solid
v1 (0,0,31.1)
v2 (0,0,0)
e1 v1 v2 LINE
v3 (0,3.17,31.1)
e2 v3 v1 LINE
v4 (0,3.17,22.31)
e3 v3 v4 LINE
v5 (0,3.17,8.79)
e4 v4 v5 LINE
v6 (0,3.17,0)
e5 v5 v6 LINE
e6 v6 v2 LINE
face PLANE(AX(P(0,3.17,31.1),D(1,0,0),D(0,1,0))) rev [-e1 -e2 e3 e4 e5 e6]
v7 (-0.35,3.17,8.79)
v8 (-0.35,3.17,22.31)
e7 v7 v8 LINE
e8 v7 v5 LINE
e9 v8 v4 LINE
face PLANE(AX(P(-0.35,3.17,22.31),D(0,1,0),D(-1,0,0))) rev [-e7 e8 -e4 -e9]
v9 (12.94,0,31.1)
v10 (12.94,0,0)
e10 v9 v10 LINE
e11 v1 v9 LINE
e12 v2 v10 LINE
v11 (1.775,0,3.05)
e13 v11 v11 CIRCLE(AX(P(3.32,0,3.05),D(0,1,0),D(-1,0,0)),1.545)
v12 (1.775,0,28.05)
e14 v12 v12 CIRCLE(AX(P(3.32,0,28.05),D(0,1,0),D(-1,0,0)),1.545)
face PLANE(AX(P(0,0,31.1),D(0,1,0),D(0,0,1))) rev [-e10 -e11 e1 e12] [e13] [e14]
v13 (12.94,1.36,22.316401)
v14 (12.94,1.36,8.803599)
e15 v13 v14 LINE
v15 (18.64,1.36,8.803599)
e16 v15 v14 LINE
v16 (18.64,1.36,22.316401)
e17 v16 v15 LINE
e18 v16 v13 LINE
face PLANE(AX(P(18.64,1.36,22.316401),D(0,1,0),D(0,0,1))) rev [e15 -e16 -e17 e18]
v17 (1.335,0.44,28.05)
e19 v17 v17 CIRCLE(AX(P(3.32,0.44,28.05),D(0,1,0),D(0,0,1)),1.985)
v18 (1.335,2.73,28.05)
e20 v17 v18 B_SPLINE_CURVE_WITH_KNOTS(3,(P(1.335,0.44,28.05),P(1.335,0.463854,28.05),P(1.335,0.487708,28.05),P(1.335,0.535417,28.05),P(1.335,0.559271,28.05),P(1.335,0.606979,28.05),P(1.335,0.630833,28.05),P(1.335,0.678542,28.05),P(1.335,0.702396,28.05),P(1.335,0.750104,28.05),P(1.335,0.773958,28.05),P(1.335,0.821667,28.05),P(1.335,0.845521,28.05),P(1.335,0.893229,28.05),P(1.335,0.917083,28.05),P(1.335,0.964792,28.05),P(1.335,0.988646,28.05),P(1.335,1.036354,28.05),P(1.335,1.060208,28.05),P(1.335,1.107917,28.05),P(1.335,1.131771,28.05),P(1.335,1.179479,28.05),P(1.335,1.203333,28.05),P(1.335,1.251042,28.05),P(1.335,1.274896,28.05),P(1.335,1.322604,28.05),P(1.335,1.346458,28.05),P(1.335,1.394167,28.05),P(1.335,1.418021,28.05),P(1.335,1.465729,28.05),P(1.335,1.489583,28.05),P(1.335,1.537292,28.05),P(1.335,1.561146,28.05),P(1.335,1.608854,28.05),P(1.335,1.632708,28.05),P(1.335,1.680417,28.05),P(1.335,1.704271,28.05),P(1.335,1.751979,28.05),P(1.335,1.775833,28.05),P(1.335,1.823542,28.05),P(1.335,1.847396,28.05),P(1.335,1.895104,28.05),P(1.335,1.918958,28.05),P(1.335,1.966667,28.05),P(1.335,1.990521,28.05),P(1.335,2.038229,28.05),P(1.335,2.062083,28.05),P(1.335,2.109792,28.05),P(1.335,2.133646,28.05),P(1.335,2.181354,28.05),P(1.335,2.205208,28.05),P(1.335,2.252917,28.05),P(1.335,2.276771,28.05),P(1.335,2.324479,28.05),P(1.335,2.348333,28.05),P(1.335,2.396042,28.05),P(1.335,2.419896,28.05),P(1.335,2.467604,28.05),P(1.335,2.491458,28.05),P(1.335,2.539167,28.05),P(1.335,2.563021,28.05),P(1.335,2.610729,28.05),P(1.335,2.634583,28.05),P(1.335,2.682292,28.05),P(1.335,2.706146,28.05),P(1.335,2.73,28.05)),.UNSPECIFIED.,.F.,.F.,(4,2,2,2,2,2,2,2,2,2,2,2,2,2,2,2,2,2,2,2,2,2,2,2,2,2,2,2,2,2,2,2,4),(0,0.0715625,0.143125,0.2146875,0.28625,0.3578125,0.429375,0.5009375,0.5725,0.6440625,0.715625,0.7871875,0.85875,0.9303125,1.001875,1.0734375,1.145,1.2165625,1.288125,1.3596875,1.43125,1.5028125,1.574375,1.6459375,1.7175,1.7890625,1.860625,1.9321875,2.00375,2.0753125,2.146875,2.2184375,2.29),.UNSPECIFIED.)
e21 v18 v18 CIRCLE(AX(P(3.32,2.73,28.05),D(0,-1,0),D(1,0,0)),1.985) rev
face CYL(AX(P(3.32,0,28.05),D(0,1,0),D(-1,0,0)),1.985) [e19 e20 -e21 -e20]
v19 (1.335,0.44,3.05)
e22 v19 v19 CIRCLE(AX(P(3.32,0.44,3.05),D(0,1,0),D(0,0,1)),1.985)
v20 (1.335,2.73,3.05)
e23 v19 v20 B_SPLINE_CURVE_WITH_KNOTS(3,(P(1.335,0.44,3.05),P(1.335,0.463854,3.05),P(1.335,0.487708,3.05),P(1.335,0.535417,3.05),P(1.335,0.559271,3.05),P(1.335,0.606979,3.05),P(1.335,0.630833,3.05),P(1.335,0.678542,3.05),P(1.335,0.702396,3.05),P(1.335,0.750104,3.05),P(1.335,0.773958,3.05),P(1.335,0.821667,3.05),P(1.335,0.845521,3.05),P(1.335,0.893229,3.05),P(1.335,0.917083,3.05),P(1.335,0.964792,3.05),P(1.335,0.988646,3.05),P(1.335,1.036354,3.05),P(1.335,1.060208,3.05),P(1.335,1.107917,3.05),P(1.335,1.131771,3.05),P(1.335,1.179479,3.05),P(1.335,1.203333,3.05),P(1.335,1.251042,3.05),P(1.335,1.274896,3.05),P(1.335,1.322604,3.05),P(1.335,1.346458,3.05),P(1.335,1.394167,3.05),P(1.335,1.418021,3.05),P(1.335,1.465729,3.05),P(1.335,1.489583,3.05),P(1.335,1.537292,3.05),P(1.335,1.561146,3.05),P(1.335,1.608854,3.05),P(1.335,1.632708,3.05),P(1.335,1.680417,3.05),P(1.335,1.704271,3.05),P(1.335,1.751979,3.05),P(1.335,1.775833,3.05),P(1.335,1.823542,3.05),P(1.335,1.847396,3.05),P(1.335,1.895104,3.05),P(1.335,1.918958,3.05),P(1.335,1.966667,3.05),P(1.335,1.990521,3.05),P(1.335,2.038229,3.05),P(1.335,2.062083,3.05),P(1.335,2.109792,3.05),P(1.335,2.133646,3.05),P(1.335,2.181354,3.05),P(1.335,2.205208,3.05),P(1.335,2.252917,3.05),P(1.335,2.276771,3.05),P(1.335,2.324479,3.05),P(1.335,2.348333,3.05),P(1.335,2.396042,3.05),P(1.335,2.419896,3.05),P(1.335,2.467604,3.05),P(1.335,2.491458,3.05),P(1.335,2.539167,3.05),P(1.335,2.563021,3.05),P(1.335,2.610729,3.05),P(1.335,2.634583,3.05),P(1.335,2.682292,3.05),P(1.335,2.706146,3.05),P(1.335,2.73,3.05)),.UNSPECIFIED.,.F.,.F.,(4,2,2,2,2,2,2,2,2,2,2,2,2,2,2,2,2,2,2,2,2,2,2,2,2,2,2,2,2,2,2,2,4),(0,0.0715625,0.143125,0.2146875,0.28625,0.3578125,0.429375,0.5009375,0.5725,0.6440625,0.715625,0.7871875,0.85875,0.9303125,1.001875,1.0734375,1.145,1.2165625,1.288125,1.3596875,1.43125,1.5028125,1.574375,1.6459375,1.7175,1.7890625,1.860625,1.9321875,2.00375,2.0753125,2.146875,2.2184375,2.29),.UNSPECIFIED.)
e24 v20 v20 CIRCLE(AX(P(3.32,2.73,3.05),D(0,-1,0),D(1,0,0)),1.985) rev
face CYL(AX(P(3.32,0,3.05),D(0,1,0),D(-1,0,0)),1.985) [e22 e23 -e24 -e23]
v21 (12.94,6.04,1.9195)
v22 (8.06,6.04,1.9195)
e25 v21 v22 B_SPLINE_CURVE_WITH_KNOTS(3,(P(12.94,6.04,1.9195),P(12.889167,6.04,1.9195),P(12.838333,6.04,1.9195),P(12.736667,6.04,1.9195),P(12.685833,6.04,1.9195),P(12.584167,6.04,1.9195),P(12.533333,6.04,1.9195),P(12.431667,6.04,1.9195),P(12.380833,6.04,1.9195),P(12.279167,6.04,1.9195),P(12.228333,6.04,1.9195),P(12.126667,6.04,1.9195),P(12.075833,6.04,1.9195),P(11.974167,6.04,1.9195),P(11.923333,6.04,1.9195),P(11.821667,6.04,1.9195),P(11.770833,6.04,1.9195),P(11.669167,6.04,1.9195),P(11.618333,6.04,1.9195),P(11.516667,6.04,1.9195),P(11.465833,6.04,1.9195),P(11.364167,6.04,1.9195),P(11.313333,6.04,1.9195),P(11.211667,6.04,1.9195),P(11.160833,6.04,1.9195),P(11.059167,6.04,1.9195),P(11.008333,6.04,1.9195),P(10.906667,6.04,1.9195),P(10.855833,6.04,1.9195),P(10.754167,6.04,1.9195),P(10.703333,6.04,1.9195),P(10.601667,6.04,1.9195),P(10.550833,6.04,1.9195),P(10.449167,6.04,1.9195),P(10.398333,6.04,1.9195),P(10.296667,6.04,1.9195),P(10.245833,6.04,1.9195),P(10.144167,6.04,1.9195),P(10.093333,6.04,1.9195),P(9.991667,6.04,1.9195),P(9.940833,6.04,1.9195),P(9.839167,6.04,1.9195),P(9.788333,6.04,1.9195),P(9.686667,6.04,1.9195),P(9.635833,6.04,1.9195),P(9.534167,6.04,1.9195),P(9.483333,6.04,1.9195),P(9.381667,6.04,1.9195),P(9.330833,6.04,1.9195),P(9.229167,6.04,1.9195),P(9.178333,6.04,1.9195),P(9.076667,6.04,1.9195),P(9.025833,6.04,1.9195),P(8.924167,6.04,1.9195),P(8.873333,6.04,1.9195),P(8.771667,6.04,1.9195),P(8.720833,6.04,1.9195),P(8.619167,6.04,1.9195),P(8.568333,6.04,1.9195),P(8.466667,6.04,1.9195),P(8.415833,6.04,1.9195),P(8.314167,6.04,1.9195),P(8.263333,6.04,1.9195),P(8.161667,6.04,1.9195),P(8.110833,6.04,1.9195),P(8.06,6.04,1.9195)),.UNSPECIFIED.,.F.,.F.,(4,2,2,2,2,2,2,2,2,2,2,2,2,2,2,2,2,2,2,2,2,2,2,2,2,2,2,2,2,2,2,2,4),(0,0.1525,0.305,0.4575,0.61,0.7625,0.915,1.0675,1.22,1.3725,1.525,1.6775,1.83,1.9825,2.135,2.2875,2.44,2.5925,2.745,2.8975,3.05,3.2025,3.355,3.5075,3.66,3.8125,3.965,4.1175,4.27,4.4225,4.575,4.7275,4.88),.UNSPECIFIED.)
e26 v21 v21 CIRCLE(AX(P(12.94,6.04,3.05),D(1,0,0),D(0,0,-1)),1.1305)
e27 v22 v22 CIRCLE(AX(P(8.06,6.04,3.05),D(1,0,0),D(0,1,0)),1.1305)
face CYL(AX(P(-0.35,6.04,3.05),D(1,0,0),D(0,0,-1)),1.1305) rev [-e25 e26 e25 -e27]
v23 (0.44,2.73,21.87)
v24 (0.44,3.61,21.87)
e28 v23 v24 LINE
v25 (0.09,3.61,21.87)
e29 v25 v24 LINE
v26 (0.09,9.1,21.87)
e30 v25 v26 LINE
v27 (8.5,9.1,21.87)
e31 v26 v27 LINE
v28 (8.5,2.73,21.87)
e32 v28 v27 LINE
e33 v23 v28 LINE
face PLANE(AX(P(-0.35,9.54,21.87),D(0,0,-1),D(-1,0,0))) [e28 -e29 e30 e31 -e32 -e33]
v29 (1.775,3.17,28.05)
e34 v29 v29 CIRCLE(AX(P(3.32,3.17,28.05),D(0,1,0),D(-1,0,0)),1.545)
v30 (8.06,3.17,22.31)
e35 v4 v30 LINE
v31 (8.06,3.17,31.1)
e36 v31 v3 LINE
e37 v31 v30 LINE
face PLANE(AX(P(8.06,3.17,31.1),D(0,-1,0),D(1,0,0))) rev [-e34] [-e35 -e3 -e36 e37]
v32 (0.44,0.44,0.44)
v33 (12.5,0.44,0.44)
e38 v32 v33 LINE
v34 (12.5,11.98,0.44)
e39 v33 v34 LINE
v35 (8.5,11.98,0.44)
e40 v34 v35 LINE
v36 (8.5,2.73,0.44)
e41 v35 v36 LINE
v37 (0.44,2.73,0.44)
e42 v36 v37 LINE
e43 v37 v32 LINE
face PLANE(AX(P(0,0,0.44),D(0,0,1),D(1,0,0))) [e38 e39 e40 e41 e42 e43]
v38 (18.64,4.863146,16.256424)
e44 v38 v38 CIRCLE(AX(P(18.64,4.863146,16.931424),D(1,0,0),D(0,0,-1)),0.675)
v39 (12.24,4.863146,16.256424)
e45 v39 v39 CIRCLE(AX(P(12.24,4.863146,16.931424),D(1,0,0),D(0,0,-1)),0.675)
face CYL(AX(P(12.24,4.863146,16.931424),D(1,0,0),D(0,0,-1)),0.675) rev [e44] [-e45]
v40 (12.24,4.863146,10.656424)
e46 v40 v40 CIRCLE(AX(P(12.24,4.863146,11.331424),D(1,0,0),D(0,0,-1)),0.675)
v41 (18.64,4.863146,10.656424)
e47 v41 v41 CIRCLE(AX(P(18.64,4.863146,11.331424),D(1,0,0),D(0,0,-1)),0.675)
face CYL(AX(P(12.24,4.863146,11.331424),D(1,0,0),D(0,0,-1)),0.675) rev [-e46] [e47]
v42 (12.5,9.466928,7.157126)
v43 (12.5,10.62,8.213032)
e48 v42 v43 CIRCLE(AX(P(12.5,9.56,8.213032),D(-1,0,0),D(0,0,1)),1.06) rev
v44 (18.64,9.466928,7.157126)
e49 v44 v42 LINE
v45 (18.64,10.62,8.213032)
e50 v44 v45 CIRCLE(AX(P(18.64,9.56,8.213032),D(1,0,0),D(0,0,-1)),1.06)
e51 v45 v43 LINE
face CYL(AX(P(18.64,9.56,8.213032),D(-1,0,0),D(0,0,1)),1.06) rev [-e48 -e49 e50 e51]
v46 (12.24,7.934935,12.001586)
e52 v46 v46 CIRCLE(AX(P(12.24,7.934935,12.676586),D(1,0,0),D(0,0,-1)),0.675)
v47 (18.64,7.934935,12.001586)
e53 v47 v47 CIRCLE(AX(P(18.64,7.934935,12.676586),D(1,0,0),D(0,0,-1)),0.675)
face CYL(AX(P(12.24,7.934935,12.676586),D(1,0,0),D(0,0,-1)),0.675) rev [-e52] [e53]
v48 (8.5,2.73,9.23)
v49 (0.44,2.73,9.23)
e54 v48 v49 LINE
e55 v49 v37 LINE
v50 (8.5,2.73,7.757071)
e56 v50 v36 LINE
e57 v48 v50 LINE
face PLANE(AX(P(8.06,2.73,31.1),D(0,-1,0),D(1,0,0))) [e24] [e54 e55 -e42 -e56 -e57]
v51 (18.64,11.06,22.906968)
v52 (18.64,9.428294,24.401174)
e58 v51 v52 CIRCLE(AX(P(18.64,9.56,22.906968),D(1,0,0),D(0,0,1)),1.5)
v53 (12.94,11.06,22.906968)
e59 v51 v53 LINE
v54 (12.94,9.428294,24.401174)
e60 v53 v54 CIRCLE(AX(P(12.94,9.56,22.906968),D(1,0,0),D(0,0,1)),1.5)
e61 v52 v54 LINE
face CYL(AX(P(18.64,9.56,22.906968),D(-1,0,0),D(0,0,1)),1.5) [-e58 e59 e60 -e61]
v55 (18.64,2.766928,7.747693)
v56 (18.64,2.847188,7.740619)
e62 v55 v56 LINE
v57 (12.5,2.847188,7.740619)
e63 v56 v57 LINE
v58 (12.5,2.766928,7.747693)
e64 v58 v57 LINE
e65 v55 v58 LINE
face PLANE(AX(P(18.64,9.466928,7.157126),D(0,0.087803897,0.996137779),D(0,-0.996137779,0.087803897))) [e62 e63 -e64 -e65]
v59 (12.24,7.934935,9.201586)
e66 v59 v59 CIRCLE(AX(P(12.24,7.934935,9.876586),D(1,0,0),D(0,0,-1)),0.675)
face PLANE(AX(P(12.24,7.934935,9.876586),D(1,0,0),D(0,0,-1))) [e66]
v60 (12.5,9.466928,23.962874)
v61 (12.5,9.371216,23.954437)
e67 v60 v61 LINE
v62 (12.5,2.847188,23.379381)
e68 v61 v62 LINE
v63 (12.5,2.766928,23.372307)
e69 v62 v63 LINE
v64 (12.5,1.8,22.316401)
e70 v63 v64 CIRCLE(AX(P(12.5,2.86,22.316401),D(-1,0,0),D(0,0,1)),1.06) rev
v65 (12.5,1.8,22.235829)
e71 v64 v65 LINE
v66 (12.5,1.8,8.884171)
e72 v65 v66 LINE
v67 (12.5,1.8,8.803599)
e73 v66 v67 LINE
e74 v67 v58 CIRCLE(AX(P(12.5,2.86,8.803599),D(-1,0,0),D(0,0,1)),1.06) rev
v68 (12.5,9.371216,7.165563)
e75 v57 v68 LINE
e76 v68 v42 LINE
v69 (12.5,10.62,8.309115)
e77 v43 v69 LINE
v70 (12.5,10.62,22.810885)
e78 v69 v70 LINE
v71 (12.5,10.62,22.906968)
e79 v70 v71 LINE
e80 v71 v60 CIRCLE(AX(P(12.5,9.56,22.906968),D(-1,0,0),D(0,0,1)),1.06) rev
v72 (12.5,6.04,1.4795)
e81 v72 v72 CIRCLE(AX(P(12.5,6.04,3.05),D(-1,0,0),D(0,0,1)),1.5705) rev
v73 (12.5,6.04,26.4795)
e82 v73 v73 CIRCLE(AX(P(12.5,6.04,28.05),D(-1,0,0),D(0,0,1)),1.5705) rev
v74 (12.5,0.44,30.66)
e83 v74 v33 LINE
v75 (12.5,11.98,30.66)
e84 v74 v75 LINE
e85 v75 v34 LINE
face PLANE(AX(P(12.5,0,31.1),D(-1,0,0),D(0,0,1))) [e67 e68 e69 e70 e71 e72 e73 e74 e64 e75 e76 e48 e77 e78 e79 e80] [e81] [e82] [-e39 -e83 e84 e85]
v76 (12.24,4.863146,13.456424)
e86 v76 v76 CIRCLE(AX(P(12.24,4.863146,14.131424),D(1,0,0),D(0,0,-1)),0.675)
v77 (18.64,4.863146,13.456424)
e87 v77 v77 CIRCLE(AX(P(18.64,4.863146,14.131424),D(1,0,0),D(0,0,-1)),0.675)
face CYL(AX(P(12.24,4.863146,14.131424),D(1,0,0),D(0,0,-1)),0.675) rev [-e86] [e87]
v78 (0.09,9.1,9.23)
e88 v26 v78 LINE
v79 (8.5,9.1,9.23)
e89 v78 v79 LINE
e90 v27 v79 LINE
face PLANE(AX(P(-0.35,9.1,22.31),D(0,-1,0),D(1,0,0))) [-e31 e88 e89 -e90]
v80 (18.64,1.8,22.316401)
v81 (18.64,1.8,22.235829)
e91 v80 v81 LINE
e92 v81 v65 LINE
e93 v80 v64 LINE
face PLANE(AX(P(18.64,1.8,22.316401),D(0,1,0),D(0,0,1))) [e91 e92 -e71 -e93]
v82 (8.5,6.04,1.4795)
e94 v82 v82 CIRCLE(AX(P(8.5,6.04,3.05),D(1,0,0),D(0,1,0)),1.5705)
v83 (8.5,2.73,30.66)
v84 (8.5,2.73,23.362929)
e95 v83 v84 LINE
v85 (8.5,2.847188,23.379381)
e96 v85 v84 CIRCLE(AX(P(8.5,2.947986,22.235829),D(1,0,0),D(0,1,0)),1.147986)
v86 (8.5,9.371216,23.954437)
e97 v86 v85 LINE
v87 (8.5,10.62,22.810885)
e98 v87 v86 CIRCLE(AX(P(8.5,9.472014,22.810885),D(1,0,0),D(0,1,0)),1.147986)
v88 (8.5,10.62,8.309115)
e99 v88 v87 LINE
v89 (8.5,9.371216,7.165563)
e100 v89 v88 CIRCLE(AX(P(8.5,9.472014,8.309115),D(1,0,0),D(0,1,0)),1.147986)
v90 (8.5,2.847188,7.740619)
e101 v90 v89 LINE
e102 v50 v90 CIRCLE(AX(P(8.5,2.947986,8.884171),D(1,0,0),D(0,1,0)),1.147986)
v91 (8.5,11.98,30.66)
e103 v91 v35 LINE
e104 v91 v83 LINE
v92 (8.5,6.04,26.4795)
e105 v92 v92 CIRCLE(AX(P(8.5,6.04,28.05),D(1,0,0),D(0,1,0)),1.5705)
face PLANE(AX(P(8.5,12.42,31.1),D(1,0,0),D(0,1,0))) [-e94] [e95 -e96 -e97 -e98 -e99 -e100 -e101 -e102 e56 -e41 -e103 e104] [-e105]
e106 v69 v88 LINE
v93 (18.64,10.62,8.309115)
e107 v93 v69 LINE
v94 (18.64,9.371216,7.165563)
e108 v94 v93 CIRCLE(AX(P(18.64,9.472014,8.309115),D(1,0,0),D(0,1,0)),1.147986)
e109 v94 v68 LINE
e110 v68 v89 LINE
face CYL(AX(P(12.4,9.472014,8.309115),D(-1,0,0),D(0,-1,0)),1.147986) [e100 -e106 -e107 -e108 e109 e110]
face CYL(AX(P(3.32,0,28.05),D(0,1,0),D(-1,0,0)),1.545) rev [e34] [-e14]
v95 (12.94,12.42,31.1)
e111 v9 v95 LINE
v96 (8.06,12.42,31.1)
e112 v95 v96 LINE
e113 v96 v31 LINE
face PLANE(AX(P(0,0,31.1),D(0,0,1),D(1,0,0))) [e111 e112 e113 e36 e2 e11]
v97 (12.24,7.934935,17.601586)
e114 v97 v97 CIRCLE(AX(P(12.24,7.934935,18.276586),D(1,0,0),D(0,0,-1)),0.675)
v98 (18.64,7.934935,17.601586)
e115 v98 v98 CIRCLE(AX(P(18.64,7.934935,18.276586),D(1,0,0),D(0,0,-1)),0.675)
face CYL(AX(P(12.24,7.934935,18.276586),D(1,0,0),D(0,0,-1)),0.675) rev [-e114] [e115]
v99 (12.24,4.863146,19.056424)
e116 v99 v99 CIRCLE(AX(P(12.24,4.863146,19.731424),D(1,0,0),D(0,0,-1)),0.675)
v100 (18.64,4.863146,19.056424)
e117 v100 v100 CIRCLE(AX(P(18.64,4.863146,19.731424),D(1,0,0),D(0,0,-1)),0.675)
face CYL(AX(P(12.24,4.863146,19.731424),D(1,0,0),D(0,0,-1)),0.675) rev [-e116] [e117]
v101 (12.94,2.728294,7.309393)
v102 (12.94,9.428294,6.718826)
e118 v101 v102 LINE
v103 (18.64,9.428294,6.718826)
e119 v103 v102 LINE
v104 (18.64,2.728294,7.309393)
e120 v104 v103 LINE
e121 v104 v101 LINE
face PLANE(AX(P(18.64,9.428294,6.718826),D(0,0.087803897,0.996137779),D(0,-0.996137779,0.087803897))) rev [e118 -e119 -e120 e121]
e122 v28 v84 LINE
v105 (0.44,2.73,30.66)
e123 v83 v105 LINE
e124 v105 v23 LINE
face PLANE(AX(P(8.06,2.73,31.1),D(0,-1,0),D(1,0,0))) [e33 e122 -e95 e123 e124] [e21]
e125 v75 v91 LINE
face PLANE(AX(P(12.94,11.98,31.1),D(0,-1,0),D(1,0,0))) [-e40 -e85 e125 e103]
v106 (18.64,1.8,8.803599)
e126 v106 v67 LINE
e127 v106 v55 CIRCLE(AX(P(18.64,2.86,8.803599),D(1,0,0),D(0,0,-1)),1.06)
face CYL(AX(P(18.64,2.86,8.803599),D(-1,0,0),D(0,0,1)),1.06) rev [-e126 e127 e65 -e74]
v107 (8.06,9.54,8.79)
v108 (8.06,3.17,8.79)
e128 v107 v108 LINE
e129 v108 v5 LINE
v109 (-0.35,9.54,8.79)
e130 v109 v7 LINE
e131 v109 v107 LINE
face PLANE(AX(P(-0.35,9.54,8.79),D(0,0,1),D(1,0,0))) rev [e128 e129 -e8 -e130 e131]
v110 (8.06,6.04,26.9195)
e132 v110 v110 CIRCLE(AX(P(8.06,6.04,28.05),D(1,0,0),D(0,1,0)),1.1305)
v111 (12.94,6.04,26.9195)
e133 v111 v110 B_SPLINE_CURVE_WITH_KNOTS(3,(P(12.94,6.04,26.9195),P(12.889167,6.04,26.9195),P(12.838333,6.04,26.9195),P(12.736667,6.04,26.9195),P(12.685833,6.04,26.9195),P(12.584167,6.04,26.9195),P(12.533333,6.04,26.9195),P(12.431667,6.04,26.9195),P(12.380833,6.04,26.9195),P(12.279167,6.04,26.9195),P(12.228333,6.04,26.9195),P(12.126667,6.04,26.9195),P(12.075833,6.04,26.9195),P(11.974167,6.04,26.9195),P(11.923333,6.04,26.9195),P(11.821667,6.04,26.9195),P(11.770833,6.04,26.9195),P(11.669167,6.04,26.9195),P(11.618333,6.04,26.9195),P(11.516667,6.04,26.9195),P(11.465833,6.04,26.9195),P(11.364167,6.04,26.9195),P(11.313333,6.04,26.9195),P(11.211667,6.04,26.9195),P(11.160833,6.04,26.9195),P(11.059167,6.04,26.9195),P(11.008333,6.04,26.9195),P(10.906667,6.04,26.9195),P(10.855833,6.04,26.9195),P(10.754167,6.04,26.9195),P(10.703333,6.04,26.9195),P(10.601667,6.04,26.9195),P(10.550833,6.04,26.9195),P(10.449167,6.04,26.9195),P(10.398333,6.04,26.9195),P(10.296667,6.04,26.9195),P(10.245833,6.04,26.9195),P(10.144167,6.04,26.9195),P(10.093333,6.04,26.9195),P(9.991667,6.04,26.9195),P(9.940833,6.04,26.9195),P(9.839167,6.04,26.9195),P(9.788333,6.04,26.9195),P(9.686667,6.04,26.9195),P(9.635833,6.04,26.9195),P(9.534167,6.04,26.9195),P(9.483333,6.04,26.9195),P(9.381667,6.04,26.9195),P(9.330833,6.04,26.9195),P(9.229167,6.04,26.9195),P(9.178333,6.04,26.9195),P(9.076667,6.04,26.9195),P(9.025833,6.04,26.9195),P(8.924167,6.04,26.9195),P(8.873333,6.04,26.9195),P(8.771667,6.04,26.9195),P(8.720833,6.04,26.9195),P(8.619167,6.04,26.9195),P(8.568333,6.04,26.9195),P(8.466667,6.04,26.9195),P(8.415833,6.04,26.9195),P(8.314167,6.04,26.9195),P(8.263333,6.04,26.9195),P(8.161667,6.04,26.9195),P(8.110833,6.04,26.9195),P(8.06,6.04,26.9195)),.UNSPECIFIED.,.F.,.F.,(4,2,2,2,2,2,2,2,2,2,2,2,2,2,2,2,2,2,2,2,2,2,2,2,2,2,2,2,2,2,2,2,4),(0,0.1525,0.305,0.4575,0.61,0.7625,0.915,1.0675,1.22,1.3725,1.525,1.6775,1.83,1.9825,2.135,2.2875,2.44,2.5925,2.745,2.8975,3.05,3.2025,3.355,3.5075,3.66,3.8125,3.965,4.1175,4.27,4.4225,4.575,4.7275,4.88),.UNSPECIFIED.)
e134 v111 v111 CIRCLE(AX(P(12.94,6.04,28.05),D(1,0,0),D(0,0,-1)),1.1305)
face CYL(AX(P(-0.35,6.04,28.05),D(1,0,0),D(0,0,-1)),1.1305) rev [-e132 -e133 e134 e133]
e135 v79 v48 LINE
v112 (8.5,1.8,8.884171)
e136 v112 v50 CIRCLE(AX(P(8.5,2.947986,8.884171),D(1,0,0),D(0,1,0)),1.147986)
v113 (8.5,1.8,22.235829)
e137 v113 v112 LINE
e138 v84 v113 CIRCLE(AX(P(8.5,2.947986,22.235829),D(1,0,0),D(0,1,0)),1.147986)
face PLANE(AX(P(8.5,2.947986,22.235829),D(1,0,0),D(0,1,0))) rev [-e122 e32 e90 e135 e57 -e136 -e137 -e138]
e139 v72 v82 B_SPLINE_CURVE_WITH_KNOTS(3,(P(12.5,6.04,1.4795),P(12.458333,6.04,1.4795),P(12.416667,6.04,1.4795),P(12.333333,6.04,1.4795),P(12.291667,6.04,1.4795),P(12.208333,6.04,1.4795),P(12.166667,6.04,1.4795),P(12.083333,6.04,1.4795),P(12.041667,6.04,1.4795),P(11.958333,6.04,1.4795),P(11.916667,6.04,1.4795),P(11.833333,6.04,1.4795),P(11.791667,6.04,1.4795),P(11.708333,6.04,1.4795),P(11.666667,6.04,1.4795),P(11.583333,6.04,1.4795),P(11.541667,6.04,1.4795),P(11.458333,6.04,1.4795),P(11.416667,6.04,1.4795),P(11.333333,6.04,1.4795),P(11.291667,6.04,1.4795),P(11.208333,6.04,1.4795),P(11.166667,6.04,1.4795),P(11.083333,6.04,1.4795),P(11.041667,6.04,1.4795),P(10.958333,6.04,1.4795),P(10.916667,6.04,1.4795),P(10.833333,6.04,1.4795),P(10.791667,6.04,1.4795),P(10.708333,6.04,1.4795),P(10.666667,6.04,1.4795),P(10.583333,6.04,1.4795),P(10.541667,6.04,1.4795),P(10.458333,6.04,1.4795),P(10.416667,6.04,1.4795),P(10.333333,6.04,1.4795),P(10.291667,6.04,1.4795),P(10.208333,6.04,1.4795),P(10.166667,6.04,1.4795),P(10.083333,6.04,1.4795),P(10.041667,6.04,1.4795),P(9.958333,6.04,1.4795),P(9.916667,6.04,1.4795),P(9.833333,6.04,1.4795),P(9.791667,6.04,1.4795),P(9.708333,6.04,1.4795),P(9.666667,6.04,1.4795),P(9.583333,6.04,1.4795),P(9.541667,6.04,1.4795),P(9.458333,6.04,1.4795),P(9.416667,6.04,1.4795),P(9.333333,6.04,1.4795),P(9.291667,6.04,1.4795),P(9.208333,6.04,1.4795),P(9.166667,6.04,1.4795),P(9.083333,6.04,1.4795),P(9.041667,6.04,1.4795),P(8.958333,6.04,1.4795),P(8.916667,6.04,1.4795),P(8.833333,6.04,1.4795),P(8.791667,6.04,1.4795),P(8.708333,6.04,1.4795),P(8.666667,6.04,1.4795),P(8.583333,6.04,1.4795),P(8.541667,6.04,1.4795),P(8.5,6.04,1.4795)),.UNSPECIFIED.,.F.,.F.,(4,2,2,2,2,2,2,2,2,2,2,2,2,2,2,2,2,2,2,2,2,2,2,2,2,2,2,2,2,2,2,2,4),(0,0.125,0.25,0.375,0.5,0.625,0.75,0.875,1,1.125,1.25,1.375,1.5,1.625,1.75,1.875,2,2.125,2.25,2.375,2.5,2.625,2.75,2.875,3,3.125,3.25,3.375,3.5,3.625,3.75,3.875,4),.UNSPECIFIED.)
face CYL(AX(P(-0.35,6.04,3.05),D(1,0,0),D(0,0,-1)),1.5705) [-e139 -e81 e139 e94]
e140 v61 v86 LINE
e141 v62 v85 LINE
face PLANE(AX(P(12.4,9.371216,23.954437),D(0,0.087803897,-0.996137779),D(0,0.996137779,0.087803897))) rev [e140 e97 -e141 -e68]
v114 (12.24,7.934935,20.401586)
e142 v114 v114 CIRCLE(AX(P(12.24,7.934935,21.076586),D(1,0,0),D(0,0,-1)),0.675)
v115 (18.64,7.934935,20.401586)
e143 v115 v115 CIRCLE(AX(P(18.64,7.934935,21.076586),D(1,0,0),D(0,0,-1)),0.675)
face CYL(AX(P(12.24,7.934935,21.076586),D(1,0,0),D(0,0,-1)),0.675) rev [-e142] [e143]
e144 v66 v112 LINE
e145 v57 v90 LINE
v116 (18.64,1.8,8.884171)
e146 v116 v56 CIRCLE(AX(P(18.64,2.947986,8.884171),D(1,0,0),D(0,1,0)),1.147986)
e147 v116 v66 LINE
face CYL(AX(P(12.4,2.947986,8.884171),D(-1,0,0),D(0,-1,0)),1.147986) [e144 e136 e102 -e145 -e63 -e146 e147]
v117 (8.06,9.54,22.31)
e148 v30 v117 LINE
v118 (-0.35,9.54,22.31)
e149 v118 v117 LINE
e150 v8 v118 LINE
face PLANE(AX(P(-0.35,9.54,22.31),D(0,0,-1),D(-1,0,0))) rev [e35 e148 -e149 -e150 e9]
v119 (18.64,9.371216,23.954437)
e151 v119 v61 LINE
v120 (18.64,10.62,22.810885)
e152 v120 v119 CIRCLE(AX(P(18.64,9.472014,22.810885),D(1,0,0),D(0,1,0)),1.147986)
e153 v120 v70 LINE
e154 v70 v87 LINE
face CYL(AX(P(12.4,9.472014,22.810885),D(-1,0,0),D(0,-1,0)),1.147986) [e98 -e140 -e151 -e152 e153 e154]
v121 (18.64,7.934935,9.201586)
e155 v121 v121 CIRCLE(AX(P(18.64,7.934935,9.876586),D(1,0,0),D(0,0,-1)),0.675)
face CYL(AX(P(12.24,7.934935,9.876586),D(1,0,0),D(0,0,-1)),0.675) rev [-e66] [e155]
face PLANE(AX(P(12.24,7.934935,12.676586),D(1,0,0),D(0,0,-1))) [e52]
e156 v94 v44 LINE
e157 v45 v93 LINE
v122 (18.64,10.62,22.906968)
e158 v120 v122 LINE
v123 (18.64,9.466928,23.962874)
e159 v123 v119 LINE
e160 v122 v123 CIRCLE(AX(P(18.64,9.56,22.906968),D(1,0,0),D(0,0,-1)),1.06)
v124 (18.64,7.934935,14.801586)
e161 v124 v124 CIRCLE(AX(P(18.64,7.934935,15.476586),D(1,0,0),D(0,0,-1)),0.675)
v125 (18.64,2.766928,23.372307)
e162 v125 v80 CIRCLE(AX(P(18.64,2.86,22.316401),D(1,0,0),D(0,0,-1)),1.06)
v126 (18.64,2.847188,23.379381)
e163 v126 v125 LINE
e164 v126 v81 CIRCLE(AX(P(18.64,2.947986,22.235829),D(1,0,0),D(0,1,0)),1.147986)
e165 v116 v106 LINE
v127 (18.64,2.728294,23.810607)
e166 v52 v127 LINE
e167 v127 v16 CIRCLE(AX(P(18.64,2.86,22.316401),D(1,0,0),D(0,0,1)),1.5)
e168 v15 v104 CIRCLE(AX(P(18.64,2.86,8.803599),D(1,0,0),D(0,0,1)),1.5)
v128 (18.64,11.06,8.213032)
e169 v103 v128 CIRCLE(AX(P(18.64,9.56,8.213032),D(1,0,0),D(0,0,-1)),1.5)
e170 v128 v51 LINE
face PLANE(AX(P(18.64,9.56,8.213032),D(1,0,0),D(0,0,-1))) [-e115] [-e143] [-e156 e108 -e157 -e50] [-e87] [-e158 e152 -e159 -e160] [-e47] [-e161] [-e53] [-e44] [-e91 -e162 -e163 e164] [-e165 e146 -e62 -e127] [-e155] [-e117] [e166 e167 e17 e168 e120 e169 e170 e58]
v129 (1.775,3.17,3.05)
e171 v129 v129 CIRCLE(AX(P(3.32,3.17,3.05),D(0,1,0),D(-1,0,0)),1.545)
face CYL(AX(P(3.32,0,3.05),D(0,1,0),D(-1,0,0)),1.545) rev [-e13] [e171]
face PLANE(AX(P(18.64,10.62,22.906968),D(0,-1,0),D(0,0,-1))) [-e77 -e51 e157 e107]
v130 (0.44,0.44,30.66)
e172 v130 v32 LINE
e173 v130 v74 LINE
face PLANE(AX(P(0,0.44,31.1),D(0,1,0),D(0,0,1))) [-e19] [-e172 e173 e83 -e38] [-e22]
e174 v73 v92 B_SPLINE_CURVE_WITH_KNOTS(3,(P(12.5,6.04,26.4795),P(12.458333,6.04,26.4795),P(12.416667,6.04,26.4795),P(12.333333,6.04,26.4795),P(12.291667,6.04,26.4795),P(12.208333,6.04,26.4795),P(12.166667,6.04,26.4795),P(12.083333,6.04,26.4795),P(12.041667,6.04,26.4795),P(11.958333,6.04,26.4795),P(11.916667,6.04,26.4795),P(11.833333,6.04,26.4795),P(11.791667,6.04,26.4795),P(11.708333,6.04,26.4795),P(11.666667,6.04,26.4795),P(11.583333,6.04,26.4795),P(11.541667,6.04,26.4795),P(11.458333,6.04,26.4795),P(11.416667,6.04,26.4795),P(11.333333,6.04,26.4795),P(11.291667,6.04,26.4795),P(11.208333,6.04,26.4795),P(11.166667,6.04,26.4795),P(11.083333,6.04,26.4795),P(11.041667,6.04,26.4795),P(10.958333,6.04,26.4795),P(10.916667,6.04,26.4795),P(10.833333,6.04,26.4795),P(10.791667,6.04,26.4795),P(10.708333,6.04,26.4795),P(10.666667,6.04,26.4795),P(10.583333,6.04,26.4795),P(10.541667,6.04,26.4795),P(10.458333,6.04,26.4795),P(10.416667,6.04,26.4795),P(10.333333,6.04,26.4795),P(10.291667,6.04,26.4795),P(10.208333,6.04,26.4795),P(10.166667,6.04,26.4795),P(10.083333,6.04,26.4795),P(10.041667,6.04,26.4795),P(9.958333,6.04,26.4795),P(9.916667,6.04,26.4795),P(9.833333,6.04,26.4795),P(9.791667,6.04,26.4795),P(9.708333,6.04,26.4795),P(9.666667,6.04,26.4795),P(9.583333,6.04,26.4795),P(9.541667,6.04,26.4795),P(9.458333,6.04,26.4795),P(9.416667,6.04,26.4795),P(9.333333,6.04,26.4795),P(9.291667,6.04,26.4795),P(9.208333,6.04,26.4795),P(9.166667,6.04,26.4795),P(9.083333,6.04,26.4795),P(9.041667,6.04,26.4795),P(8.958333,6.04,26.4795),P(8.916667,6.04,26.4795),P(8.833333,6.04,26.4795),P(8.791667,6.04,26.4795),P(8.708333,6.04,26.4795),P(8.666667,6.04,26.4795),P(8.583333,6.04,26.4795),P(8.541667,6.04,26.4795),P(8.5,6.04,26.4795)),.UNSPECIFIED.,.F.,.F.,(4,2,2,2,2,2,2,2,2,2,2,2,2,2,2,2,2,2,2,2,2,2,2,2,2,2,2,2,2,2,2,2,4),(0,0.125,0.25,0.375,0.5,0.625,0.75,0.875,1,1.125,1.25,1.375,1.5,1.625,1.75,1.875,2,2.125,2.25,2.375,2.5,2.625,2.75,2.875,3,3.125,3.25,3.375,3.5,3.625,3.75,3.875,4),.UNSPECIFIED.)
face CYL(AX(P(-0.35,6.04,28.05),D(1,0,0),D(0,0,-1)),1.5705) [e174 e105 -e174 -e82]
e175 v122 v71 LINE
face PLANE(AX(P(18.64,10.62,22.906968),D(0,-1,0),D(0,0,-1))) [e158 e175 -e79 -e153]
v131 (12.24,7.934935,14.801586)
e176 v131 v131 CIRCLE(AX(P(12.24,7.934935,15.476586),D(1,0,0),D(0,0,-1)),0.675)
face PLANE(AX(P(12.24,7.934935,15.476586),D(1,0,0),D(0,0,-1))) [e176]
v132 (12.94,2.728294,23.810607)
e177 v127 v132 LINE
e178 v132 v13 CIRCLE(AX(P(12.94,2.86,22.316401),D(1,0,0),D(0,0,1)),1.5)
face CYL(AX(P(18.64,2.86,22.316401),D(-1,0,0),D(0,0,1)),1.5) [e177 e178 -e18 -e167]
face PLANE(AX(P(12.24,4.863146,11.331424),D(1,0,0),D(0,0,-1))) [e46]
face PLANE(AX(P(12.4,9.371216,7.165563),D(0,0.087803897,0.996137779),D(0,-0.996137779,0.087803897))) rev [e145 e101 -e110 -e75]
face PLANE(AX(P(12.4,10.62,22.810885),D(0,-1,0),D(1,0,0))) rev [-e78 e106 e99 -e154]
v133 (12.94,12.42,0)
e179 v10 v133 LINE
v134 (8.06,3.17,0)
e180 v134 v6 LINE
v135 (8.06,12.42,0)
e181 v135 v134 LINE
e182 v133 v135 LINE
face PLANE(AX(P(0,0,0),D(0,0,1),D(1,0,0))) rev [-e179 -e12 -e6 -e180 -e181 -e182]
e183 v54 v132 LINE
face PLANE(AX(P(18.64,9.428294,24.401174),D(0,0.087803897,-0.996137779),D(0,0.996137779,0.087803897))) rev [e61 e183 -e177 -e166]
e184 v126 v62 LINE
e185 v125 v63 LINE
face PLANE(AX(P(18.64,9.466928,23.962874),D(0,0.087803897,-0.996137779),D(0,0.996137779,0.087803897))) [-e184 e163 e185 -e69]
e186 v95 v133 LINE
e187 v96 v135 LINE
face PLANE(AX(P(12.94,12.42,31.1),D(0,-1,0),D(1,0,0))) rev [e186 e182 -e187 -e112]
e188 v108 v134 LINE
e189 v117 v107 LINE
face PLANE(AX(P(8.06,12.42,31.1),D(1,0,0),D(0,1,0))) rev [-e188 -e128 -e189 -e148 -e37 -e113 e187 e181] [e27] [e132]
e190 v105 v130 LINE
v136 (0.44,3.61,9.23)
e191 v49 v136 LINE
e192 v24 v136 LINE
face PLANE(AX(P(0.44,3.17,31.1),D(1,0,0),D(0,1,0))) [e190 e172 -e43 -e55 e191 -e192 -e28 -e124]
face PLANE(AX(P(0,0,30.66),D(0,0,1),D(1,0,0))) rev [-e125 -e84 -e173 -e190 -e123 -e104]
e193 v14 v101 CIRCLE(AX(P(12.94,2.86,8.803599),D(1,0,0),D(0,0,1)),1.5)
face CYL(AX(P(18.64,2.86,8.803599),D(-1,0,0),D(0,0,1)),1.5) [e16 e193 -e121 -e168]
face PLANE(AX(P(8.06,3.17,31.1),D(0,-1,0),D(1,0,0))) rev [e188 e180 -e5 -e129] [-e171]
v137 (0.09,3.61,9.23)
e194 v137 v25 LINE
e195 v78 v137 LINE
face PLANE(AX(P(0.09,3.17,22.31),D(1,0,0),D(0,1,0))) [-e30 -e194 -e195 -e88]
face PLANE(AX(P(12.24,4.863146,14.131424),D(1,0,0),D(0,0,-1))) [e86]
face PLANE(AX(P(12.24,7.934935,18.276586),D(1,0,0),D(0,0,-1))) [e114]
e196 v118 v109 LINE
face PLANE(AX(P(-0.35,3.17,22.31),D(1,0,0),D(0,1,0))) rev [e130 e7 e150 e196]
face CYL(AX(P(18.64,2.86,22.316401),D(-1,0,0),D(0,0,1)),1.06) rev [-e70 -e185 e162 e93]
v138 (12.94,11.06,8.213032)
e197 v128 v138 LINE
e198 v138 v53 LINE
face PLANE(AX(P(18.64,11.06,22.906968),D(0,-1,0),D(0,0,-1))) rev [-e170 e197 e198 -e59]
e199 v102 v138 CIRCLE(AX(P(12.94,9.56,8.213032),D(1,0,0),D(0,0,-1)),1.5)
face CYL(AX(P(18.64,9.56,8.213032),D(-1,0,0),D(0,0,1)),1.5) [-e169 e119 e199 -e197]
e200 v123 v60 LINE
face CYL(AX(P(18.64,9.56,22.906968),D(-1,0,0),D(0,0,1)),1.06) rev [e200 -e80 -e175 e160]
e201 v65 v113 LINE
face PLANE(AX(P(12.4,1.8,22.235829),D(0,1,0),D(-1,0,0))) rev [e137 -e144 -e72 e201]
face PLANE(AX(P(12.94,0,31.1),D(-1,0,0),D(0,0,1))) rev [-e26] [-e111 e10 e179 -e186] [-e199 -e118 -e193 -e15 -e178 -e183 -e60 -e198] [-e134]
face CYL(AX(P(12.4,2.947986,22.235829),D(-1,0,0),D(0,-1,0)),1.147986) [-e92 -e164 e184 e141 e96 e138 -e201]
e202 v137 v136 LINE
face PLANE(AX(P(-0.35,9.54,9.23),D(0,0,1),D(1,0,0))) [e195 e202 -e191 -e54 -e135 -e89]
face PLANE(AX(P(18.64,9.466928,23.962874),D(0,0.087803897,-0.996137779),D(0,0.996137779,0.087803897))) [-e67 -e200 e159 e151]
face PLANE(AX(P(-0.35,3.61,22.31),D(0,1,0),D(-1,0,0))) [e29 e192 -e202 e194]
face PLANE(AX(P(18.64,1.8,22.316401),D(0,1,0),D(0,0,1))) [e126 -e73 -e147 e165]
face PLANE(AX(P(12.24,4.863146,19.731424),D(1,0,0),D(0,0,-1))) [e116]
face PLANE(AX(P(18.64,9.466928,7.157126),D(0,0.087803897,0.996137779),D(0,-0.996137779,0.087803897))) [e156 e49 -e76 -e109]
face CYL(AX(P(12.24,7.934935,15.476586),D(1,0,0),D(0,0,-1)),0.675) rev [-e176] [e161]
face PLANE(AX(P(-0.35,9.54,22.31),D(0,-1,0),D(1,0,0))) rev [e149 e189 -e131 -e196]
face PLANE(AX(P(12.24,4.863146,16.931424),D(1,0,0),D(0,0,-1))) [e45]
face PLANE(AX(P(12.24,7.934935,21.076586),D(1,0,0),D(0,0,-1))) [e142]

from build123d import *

# Parameters (mm, degrees)
BASE_EXTRUDE_DEPTH         = 31.1
SKETCH2_W                  = 13.52
SKETCH2_H                  = 6.37
BOSS_EXTRUDE1_DEPTH        = 8.41
SKETCH3_R                  = 1.545
BASE_MOUNTING_HOLE_1_DEPTH = 35.931591719
SKETCH5_R                  = 1.1305
FACE_MOUNTING_HOLES_DEPTH  = 37.029023023
SHELL_AROUND_PINS_DEPTH    = 5.7
SHELL1_START               = 0.44
SHELL1_DEPTH               = 18.2
SHELL1_START_2             = 8.5
SHELL1_2_OUTLINE_W         = 11.54
SHELL1_2_OUTLINE_H         = 30.22
SHELL1_2_OUTLINE_R         = 1.5705
SHELL1_2_DEPTH             = 4
SHELL1_START_3             = 12.5
SHELL1_3_DEPTH             = 6.14
SHELL1_START_4             = 5.3050001
SHELL1_4_DEPTH             = 3.1949999
SHELL1_5_DEPTH             = 0.8949999
SHELL1_START_5             = 0.09
SHELL1_6_OUTLINE_W         = 5.49
SHELL1_6_OUTLINE_H         = 12.64
SHELL1_6_DEPTH             = 0.35
SHELL1_7_DEPTH             = 2.29
BOSS_EXTRUDE2_DEPTH        = 3.9
BOSS_EXTRUDE3_DEPTH        = 6.24
SKETCH9_R                  = 0.675
CUT_EXTRUDE1_DEPTH         = 6.4


with BuildPart() as part:
    # Sketch1 → Base-Extrude (new body)
    with BuildSketch(Plane.XY):
        Polygon((0, 0), (12.94, 0), (12.94, 12.42), (8.06, 12.42), (8.06, 3.17), (0, 3.17), align=None)
    extrude(amount=BASE_EXTRUDE_DEPTH)

    # Sketch2 → Boss-Extrude1 (add)
    with BuildSketch(Plane.ZY.offset(-8.06)):
        with Locations((15.55, 6.355)):
            Rectangle(SKETCH2_W, SKETCH2_H)
    extrude(amount=BOSS_EXTRUDE1_DEPTH)

    # Sketch3 → Base Mounting Hole 1 (cut, through all)
    with BuildSketch(Plane(origin=(0, 3.17, 0), x_dir=(-1, 0, 0), z_dir=(0, 1, 0))):
        with Locations((-3.32, 3.05)):
            Circle(SKETCH3_R)
        with Locations((-3.32, 28.05)):
            Circle(SKETCH3_R)
    extrude(amount=-BASE_MOUNTING_HOLE_1_DEPTH, mode=Mode.SUBTRACT)

    # Sketch5 → Face Mounting Holes (cut, through all)
    with BuildSketch(Plane(origin=(12.94, 0, 0), x_dir=(0, 0, -1), z_dir=(1, 0, 0))):
        with Locations((-3.05, 6.04)):
            Circle(SKETCH5_R)
        with Locations((-28.05, 6.04)):
            Circle(SKETCH5_R)
    extrude(amount=-FACE_MOUNTING_HOLES_DEPTH, mode=Mode.SUBTRACT)

    # Sketch6 → Shell around Pins (add)
    with BuildSketch(Plane(origin=(12.94, 0, 0), x_dir=(0, 0, -1), z_dir=(1, 0, 0))):
        with BuildLine():
            Line((-22.906967712, 11.06), (-8.213032288, 11.06))
            ThreePointArc((-8.213032288, 11.06), (-7.106786662, 10.573025476), (-6.718825618, 9.428294154))
            Line((-6.718825618, 9.428294154), (-7.309392629, 2.728294154))
            ThreePointArc((-7.309392629, 2.728294154), (-7.790573821, 1.753754374), (-8.803599298, 1.36))
            Line((-8.803599298, 1.36), (-22.316400702, 1.36))
            ThreePointArc((-22.316400702, 1.36), (-23.329426179, 1.753754374), (-23.810607371, 2.728294154))
            Line((-23.810607371, 2.728294154), (-24.401174382, 9.428294154))
            ThreePointArc((-24.401174382, 9.428294154), (-24.013213338, 10.573025476), (-22.906967712, 11.06))
        make_face()
    extrude(amount=SHELL_AROUND_PINS_DEPTH)

    # Shell1: read off the stored shape, not the designer's step
    # Shell1 outline → Shell1 (cut)
    with BuildSketch(Plane.YZ.offset(SHELL1_START)):
        with BuildLine():
            Line((2.73, 21.87), (2.73, 23.368398801))
            ThreePointArc((2.73, 23.368398801), (2.06583377, 23.018469075), (1.8, 22.316400702))
            Line((1.8, 22.316400702), (1.8, 8.803599298))
            ThreePointArc((1.8, 8.803599298), (2.06583377, 8.101530925), (2.73, 7.751601199))
            Line((2.73, 7.751601199), (2.73, 9.23))
            Line((2.73, 9.23), (9.1, 9.23))
            Line((9.1, 9.23), (9.1, 21.87))
            Line((9.1, 21.87), (2.73, 21.87))
        make_face()
    extrude(amount=SHELL1_DEPTH, mode=Mode.SUBTRACT)

    # Shell1 2 outline → Shell1 2 (cut)
    with BuildSketch(Plane.YZ.offset(SHELL1_START_2)):
        with Locations((6.21, 15.55)):
            Rectangle(SHELL1_2_OUTLINE_W, SHELL1_2_OUTLINE_H)
        with Locations((6.04, 3.05)):
            Circle(SHELL1_2_OUTLINE_R, mode=Mode.SUBTRACT)
        with Locations((6.04, 28.05)):
            Circle(SHELL1_2_OUTLINE_R, mode=Mode.SUBTRACT)
        with BuildLine():
            ThreePointArc((1.8, 22.316400702), (2.06583377, 23.018469075), (2.73, 23.368398801))
            Line((2.73, 23.368398801), (2.73, 21.87))
            Line((2.73, 21.87), (9.1, 21.87))
            Line((9.1, 21.87), (9.1, 9.23))
            Line((9.1, 9.23), (2.73, 9.23))
            Line((2.73, 9.23), (2.73, 7.751601199))
            ThreePointArc((2.73, 7.751601199), (2.06583377, 8.101530925), (1.8, 8.803599298))
            Line((1.8, 8.803599298), (1.8, 22.316400702))
        make_face(mode=Mode.SUBTRACT)
    extrude(amount=SHELL1_2_DEPTH, mode=Mode.SUBTRACT)

    # Shell1 3 outline → Shell1 3 (cut)
    with BuildSketch(Plane.YZ.offset(SHELL1_START_3)):
        with BuildLine():
            ThreePointArc((2.766927869, 23.372306748), (2.74844682, 23.370514495), (2.73, 23.368398801))
            Line((2.73, 23.368398801), (2.73, 21.87))
            Line((2.73, 21.87), (9.1, 21.87))
            Line((9.1, 21.87), (9.1, 9.23))
            Line((9.1, 9.23), (2.73, 9.23))
            Line((2.73, 9.23), (2.73, 7.751601199))
            ThreePointArc((2.73, 7.751601199), (2.74844682, 7.749485505), (2.766927869, 7.747693252))
            Line((2.766927869, 7.747693252), (9.466927869, 7.157126241))
            ThreePointArc((9.466927869, 7.157126241), (10.275871337, 7.431285379), (10.62, 8.213032288))
            Line((10.62, 8.213032288), (10.62, 22.906967712))
            ThreePointArc((10.62, 22.906967712), (10.275871337, 23.688714621), (9.466927869, 23.962873759))
            Line((9.466927869, 23.962873759), (2.766927869, 23.372306748))
        make_face()
    extrude(amount=SHELL1_3_DEPTH, mode=Mode.SUBTRACT)

    # Shell1 4 outline → Shell1 4 (cut)
    with BuildSketch(Plane.YZ.offset(SHELL1_START_4)):
        with BuildLine():
            Line((2.73, 23.368398801), (2.73, 30.66))
            Line((2.73, 30.66), (0.44, 30.66))
            Line((0.44, 30.66), (0.44, 0.44))
            Line((0.44, 0.44), (2.73, 0.44))
            Line((2.73, 0.44), (2.73, 7.751601199))
            ThreePointArc((2.73, 7.751601199), (2.06583377, 8.101530925), (1.8, 8.803599298))
            Line((1.8, 8.803599298), (1.8, 22.316400702))
            ThreePointArc((1.8, 22.316400702), (2.06583377, 23.018469075), (2.73, 23.368398801))
        make_face()
    extrude(amount=SHELL1_4_DEPTH, mode=Mode.SUBTRACT)

    # Shell1 5 outline → Shell1 5 (cut)
    with BuildSketch(Plane.YZ.offset(SHELL1_START)):
        with BuildLine():
            Line((2.73, 23.368398801), (2.73, 30.66))
            Line((2.73, 30.66), (0.44, 30.66))
            Line((0.44, 30.66), (0.44, 0.44))
            Line((0.44, 0.44), (2.73, 0.44))
            Line((2.73, 0.44), (2.73, 7.751601199))
            ThreePointArc((2.73, 7.751601199), (2.06583377, 8.101530925), (1.8, 8.803599298))
            Line((1.8, 8.803599298), (1.8, 22.316400702))
            ThreePointArc((1.8, 22.316400702), (2.06583377, 23.018469075), (2.73, 23.368398801))
        make_face()
    extrude(amount=SHELL1_5_DEPTH, mode=Mode.SUBTRACT)

    # Shell1 6 outline → Shell1 6 (cut)
    with BuildSketch(Plane.YZ.offset(SHELL1_START_5)):
        with Locations((6.355, 15.55)):
            Rectangle(SHELL1_6_OUTLINE_W, SHELL1_6_OUTLINE_H)
    extrude(amount=SHELL1_6_DEPTH, mode=Mode.SUBTRACT)

    # Shell1 7 outline → Shell1 7 (cut)
    with BuildSketch(Plane(origin=(0, 0, 0), x_dir=(1, 0, 0), z_dir=(0, 1, 0)).offset(SHELL1_START)):
        with BuildLine():
            Line((1.335, -28.05), (1.3349999, -30.66))
            Line((1.3349999, -30.66), (5.3050001, -30.66))
            Line((5.3050001, -30.66), (5.305, -28.05))
            ThreePointArc((5.305, -28.05), (3.32, -30.035), (1.335, -28.05))
        make_face()
        with BuildLine():
            Line((1.335, -3.049999981), (1.335, -28.05))
            ThreePointArc((1.335, -28.05), (3.32, -26.065), (5.305, -28.05))
            Line((5.305, -28.05), (5.305, -3.05))
            ThreePointArc((5.305, -3.05), (3.31999999, -5.035), (1.335, -3.049999981))
        make_face()
        with BuildLine():
            Line((1.3349999, -0.44), (1.335, -3.049999981))
            ThreePointArc((1.335, -3.049999981), (3.32000001, -1.065), (5.305, -3.05))
            Line((5.305, -3.05), (5.3050001, -0.44))
            Line((5.3050001, -0.44), (1.3349999, -0.44))
        make_face()
    extrude(amount=SHELL1_7_DEPTH, mode=Mode.SUBTRACT)

    # Sketch7 → Boss-Extrude2 (add)
    with BuildSketch(Plane(origin=(8.5, 0, 0), x_dir=(0, 0, -1), z_dir=(1, 0, 0))):
        with BuildLine():
            Line((-22.235829146, 1.8), (-8.884170854, 1.8))
            ThreePointArc((-8.884170854, 1.8), (-8.10887823, 2.10134964), (-7.740618755, 2.84718824))
            Line((-7.740618755, 2.84718824), (-7.165562656, 9.371216493))
            ThreePointArc((-7.165562656, 9.371216493), (-7.462478522, 10.247306751), (-8.309114756, 10.62))
            Line((-8.309114756, 10.62), (-22.810885244, 10.62))
            ThreePointArc((-22.810885244, 10.62), (-23.657521478, 10.247306751), (-23.954437344, 9.371216493))
            Line((-23.954437344, 9.371216493), (-23.379381245, 2.84718824))
            ThreePointArc((-23.379381245, 2.84718824), (-23.01112177, 2.10134964), (-22.235829146, 1.8))
        make_face()
    extrude(amount=BOSS_EXTRUDE2_DEPTH)

    # Sketch8 → Boss-Extrude3 (add)
    with BuildSketch(Plane(origin=(12.4, 0, 0), x_dir=(0, 0, -1), z_dir=(1, 0, 0))):
        with BuildLine():
            Line((-22.235829146, 1.8), (-8.884170854, 1.8))
            ThreePointArc((-8.884170854, 1.8), (-8.10887823, 2.10134964), (-7.740618755, 2.84718824))
            Line((-7.740618755, 2.84718824), (-7.165562656, 9.371216493))
            ThreePointArc((-7.165562656, 9.371216493), (-7.462478522, 10.247306751), (-8.309114756, 10.62))
            Line((-8.309114756, 10.62), (-22.810885244, 10.62))
            ThreePointArc((-22.810885244, 10.62), (-23.657521478, 10.247306751), (-23.954437344, 9.371216493))
            Line((-23.954437344, 9.371216493), (-23.379381245, 2.84718824))
            ThreePointArc((-23.379381245, 2.84718824), (-23.01112177, 2.10134964), (-22.235829146, 1.8))
        make_face()
    extrude(amount=BOSS_EXTRUDE3_DEPTH)

    # Sketch9 → Cut-Extrude1 (cut)
    with BuildSketch(Plane(origin=(18.64, 0, 0), x_dir=(0, 0, -1), z_dir=(1, 0, 0))):
        with Locations((-21.076586145, 7.934935328)):
            Circle(SKETCH9_R)
        with Locations((-18.276586145, 7.934935328)):
            Circle(SKETCH9_R)
        with Locations((-15.476586145, 7.934935328)):
            Circle(SKETCH9_R)
        with Locations((-12.676586145, 7.934935328)):
            Circle(SKETCH9_R)
        with Locations((-9.876586145, 7.934935328)):
            Circle(SKETCH9_R)
        with Locations((-19.731423712, 4.86314649)):
            Circle(SKETCH9_R)
        with Locations((-16.931423712, 4.86314649)):
            Circle(SKETCH9_R)
        with Locations((-14.131423712, 4.86314649)):
            Circle(SKETCH9_R)
        with Locations((-11.331423712, 4.86314649)):
            Circle(SKETCH9_R)
    extrude(amount=-CUT_EXTRUDE1_DEPTH, mode=Mode.SUBTRACT)


solid = part.part
